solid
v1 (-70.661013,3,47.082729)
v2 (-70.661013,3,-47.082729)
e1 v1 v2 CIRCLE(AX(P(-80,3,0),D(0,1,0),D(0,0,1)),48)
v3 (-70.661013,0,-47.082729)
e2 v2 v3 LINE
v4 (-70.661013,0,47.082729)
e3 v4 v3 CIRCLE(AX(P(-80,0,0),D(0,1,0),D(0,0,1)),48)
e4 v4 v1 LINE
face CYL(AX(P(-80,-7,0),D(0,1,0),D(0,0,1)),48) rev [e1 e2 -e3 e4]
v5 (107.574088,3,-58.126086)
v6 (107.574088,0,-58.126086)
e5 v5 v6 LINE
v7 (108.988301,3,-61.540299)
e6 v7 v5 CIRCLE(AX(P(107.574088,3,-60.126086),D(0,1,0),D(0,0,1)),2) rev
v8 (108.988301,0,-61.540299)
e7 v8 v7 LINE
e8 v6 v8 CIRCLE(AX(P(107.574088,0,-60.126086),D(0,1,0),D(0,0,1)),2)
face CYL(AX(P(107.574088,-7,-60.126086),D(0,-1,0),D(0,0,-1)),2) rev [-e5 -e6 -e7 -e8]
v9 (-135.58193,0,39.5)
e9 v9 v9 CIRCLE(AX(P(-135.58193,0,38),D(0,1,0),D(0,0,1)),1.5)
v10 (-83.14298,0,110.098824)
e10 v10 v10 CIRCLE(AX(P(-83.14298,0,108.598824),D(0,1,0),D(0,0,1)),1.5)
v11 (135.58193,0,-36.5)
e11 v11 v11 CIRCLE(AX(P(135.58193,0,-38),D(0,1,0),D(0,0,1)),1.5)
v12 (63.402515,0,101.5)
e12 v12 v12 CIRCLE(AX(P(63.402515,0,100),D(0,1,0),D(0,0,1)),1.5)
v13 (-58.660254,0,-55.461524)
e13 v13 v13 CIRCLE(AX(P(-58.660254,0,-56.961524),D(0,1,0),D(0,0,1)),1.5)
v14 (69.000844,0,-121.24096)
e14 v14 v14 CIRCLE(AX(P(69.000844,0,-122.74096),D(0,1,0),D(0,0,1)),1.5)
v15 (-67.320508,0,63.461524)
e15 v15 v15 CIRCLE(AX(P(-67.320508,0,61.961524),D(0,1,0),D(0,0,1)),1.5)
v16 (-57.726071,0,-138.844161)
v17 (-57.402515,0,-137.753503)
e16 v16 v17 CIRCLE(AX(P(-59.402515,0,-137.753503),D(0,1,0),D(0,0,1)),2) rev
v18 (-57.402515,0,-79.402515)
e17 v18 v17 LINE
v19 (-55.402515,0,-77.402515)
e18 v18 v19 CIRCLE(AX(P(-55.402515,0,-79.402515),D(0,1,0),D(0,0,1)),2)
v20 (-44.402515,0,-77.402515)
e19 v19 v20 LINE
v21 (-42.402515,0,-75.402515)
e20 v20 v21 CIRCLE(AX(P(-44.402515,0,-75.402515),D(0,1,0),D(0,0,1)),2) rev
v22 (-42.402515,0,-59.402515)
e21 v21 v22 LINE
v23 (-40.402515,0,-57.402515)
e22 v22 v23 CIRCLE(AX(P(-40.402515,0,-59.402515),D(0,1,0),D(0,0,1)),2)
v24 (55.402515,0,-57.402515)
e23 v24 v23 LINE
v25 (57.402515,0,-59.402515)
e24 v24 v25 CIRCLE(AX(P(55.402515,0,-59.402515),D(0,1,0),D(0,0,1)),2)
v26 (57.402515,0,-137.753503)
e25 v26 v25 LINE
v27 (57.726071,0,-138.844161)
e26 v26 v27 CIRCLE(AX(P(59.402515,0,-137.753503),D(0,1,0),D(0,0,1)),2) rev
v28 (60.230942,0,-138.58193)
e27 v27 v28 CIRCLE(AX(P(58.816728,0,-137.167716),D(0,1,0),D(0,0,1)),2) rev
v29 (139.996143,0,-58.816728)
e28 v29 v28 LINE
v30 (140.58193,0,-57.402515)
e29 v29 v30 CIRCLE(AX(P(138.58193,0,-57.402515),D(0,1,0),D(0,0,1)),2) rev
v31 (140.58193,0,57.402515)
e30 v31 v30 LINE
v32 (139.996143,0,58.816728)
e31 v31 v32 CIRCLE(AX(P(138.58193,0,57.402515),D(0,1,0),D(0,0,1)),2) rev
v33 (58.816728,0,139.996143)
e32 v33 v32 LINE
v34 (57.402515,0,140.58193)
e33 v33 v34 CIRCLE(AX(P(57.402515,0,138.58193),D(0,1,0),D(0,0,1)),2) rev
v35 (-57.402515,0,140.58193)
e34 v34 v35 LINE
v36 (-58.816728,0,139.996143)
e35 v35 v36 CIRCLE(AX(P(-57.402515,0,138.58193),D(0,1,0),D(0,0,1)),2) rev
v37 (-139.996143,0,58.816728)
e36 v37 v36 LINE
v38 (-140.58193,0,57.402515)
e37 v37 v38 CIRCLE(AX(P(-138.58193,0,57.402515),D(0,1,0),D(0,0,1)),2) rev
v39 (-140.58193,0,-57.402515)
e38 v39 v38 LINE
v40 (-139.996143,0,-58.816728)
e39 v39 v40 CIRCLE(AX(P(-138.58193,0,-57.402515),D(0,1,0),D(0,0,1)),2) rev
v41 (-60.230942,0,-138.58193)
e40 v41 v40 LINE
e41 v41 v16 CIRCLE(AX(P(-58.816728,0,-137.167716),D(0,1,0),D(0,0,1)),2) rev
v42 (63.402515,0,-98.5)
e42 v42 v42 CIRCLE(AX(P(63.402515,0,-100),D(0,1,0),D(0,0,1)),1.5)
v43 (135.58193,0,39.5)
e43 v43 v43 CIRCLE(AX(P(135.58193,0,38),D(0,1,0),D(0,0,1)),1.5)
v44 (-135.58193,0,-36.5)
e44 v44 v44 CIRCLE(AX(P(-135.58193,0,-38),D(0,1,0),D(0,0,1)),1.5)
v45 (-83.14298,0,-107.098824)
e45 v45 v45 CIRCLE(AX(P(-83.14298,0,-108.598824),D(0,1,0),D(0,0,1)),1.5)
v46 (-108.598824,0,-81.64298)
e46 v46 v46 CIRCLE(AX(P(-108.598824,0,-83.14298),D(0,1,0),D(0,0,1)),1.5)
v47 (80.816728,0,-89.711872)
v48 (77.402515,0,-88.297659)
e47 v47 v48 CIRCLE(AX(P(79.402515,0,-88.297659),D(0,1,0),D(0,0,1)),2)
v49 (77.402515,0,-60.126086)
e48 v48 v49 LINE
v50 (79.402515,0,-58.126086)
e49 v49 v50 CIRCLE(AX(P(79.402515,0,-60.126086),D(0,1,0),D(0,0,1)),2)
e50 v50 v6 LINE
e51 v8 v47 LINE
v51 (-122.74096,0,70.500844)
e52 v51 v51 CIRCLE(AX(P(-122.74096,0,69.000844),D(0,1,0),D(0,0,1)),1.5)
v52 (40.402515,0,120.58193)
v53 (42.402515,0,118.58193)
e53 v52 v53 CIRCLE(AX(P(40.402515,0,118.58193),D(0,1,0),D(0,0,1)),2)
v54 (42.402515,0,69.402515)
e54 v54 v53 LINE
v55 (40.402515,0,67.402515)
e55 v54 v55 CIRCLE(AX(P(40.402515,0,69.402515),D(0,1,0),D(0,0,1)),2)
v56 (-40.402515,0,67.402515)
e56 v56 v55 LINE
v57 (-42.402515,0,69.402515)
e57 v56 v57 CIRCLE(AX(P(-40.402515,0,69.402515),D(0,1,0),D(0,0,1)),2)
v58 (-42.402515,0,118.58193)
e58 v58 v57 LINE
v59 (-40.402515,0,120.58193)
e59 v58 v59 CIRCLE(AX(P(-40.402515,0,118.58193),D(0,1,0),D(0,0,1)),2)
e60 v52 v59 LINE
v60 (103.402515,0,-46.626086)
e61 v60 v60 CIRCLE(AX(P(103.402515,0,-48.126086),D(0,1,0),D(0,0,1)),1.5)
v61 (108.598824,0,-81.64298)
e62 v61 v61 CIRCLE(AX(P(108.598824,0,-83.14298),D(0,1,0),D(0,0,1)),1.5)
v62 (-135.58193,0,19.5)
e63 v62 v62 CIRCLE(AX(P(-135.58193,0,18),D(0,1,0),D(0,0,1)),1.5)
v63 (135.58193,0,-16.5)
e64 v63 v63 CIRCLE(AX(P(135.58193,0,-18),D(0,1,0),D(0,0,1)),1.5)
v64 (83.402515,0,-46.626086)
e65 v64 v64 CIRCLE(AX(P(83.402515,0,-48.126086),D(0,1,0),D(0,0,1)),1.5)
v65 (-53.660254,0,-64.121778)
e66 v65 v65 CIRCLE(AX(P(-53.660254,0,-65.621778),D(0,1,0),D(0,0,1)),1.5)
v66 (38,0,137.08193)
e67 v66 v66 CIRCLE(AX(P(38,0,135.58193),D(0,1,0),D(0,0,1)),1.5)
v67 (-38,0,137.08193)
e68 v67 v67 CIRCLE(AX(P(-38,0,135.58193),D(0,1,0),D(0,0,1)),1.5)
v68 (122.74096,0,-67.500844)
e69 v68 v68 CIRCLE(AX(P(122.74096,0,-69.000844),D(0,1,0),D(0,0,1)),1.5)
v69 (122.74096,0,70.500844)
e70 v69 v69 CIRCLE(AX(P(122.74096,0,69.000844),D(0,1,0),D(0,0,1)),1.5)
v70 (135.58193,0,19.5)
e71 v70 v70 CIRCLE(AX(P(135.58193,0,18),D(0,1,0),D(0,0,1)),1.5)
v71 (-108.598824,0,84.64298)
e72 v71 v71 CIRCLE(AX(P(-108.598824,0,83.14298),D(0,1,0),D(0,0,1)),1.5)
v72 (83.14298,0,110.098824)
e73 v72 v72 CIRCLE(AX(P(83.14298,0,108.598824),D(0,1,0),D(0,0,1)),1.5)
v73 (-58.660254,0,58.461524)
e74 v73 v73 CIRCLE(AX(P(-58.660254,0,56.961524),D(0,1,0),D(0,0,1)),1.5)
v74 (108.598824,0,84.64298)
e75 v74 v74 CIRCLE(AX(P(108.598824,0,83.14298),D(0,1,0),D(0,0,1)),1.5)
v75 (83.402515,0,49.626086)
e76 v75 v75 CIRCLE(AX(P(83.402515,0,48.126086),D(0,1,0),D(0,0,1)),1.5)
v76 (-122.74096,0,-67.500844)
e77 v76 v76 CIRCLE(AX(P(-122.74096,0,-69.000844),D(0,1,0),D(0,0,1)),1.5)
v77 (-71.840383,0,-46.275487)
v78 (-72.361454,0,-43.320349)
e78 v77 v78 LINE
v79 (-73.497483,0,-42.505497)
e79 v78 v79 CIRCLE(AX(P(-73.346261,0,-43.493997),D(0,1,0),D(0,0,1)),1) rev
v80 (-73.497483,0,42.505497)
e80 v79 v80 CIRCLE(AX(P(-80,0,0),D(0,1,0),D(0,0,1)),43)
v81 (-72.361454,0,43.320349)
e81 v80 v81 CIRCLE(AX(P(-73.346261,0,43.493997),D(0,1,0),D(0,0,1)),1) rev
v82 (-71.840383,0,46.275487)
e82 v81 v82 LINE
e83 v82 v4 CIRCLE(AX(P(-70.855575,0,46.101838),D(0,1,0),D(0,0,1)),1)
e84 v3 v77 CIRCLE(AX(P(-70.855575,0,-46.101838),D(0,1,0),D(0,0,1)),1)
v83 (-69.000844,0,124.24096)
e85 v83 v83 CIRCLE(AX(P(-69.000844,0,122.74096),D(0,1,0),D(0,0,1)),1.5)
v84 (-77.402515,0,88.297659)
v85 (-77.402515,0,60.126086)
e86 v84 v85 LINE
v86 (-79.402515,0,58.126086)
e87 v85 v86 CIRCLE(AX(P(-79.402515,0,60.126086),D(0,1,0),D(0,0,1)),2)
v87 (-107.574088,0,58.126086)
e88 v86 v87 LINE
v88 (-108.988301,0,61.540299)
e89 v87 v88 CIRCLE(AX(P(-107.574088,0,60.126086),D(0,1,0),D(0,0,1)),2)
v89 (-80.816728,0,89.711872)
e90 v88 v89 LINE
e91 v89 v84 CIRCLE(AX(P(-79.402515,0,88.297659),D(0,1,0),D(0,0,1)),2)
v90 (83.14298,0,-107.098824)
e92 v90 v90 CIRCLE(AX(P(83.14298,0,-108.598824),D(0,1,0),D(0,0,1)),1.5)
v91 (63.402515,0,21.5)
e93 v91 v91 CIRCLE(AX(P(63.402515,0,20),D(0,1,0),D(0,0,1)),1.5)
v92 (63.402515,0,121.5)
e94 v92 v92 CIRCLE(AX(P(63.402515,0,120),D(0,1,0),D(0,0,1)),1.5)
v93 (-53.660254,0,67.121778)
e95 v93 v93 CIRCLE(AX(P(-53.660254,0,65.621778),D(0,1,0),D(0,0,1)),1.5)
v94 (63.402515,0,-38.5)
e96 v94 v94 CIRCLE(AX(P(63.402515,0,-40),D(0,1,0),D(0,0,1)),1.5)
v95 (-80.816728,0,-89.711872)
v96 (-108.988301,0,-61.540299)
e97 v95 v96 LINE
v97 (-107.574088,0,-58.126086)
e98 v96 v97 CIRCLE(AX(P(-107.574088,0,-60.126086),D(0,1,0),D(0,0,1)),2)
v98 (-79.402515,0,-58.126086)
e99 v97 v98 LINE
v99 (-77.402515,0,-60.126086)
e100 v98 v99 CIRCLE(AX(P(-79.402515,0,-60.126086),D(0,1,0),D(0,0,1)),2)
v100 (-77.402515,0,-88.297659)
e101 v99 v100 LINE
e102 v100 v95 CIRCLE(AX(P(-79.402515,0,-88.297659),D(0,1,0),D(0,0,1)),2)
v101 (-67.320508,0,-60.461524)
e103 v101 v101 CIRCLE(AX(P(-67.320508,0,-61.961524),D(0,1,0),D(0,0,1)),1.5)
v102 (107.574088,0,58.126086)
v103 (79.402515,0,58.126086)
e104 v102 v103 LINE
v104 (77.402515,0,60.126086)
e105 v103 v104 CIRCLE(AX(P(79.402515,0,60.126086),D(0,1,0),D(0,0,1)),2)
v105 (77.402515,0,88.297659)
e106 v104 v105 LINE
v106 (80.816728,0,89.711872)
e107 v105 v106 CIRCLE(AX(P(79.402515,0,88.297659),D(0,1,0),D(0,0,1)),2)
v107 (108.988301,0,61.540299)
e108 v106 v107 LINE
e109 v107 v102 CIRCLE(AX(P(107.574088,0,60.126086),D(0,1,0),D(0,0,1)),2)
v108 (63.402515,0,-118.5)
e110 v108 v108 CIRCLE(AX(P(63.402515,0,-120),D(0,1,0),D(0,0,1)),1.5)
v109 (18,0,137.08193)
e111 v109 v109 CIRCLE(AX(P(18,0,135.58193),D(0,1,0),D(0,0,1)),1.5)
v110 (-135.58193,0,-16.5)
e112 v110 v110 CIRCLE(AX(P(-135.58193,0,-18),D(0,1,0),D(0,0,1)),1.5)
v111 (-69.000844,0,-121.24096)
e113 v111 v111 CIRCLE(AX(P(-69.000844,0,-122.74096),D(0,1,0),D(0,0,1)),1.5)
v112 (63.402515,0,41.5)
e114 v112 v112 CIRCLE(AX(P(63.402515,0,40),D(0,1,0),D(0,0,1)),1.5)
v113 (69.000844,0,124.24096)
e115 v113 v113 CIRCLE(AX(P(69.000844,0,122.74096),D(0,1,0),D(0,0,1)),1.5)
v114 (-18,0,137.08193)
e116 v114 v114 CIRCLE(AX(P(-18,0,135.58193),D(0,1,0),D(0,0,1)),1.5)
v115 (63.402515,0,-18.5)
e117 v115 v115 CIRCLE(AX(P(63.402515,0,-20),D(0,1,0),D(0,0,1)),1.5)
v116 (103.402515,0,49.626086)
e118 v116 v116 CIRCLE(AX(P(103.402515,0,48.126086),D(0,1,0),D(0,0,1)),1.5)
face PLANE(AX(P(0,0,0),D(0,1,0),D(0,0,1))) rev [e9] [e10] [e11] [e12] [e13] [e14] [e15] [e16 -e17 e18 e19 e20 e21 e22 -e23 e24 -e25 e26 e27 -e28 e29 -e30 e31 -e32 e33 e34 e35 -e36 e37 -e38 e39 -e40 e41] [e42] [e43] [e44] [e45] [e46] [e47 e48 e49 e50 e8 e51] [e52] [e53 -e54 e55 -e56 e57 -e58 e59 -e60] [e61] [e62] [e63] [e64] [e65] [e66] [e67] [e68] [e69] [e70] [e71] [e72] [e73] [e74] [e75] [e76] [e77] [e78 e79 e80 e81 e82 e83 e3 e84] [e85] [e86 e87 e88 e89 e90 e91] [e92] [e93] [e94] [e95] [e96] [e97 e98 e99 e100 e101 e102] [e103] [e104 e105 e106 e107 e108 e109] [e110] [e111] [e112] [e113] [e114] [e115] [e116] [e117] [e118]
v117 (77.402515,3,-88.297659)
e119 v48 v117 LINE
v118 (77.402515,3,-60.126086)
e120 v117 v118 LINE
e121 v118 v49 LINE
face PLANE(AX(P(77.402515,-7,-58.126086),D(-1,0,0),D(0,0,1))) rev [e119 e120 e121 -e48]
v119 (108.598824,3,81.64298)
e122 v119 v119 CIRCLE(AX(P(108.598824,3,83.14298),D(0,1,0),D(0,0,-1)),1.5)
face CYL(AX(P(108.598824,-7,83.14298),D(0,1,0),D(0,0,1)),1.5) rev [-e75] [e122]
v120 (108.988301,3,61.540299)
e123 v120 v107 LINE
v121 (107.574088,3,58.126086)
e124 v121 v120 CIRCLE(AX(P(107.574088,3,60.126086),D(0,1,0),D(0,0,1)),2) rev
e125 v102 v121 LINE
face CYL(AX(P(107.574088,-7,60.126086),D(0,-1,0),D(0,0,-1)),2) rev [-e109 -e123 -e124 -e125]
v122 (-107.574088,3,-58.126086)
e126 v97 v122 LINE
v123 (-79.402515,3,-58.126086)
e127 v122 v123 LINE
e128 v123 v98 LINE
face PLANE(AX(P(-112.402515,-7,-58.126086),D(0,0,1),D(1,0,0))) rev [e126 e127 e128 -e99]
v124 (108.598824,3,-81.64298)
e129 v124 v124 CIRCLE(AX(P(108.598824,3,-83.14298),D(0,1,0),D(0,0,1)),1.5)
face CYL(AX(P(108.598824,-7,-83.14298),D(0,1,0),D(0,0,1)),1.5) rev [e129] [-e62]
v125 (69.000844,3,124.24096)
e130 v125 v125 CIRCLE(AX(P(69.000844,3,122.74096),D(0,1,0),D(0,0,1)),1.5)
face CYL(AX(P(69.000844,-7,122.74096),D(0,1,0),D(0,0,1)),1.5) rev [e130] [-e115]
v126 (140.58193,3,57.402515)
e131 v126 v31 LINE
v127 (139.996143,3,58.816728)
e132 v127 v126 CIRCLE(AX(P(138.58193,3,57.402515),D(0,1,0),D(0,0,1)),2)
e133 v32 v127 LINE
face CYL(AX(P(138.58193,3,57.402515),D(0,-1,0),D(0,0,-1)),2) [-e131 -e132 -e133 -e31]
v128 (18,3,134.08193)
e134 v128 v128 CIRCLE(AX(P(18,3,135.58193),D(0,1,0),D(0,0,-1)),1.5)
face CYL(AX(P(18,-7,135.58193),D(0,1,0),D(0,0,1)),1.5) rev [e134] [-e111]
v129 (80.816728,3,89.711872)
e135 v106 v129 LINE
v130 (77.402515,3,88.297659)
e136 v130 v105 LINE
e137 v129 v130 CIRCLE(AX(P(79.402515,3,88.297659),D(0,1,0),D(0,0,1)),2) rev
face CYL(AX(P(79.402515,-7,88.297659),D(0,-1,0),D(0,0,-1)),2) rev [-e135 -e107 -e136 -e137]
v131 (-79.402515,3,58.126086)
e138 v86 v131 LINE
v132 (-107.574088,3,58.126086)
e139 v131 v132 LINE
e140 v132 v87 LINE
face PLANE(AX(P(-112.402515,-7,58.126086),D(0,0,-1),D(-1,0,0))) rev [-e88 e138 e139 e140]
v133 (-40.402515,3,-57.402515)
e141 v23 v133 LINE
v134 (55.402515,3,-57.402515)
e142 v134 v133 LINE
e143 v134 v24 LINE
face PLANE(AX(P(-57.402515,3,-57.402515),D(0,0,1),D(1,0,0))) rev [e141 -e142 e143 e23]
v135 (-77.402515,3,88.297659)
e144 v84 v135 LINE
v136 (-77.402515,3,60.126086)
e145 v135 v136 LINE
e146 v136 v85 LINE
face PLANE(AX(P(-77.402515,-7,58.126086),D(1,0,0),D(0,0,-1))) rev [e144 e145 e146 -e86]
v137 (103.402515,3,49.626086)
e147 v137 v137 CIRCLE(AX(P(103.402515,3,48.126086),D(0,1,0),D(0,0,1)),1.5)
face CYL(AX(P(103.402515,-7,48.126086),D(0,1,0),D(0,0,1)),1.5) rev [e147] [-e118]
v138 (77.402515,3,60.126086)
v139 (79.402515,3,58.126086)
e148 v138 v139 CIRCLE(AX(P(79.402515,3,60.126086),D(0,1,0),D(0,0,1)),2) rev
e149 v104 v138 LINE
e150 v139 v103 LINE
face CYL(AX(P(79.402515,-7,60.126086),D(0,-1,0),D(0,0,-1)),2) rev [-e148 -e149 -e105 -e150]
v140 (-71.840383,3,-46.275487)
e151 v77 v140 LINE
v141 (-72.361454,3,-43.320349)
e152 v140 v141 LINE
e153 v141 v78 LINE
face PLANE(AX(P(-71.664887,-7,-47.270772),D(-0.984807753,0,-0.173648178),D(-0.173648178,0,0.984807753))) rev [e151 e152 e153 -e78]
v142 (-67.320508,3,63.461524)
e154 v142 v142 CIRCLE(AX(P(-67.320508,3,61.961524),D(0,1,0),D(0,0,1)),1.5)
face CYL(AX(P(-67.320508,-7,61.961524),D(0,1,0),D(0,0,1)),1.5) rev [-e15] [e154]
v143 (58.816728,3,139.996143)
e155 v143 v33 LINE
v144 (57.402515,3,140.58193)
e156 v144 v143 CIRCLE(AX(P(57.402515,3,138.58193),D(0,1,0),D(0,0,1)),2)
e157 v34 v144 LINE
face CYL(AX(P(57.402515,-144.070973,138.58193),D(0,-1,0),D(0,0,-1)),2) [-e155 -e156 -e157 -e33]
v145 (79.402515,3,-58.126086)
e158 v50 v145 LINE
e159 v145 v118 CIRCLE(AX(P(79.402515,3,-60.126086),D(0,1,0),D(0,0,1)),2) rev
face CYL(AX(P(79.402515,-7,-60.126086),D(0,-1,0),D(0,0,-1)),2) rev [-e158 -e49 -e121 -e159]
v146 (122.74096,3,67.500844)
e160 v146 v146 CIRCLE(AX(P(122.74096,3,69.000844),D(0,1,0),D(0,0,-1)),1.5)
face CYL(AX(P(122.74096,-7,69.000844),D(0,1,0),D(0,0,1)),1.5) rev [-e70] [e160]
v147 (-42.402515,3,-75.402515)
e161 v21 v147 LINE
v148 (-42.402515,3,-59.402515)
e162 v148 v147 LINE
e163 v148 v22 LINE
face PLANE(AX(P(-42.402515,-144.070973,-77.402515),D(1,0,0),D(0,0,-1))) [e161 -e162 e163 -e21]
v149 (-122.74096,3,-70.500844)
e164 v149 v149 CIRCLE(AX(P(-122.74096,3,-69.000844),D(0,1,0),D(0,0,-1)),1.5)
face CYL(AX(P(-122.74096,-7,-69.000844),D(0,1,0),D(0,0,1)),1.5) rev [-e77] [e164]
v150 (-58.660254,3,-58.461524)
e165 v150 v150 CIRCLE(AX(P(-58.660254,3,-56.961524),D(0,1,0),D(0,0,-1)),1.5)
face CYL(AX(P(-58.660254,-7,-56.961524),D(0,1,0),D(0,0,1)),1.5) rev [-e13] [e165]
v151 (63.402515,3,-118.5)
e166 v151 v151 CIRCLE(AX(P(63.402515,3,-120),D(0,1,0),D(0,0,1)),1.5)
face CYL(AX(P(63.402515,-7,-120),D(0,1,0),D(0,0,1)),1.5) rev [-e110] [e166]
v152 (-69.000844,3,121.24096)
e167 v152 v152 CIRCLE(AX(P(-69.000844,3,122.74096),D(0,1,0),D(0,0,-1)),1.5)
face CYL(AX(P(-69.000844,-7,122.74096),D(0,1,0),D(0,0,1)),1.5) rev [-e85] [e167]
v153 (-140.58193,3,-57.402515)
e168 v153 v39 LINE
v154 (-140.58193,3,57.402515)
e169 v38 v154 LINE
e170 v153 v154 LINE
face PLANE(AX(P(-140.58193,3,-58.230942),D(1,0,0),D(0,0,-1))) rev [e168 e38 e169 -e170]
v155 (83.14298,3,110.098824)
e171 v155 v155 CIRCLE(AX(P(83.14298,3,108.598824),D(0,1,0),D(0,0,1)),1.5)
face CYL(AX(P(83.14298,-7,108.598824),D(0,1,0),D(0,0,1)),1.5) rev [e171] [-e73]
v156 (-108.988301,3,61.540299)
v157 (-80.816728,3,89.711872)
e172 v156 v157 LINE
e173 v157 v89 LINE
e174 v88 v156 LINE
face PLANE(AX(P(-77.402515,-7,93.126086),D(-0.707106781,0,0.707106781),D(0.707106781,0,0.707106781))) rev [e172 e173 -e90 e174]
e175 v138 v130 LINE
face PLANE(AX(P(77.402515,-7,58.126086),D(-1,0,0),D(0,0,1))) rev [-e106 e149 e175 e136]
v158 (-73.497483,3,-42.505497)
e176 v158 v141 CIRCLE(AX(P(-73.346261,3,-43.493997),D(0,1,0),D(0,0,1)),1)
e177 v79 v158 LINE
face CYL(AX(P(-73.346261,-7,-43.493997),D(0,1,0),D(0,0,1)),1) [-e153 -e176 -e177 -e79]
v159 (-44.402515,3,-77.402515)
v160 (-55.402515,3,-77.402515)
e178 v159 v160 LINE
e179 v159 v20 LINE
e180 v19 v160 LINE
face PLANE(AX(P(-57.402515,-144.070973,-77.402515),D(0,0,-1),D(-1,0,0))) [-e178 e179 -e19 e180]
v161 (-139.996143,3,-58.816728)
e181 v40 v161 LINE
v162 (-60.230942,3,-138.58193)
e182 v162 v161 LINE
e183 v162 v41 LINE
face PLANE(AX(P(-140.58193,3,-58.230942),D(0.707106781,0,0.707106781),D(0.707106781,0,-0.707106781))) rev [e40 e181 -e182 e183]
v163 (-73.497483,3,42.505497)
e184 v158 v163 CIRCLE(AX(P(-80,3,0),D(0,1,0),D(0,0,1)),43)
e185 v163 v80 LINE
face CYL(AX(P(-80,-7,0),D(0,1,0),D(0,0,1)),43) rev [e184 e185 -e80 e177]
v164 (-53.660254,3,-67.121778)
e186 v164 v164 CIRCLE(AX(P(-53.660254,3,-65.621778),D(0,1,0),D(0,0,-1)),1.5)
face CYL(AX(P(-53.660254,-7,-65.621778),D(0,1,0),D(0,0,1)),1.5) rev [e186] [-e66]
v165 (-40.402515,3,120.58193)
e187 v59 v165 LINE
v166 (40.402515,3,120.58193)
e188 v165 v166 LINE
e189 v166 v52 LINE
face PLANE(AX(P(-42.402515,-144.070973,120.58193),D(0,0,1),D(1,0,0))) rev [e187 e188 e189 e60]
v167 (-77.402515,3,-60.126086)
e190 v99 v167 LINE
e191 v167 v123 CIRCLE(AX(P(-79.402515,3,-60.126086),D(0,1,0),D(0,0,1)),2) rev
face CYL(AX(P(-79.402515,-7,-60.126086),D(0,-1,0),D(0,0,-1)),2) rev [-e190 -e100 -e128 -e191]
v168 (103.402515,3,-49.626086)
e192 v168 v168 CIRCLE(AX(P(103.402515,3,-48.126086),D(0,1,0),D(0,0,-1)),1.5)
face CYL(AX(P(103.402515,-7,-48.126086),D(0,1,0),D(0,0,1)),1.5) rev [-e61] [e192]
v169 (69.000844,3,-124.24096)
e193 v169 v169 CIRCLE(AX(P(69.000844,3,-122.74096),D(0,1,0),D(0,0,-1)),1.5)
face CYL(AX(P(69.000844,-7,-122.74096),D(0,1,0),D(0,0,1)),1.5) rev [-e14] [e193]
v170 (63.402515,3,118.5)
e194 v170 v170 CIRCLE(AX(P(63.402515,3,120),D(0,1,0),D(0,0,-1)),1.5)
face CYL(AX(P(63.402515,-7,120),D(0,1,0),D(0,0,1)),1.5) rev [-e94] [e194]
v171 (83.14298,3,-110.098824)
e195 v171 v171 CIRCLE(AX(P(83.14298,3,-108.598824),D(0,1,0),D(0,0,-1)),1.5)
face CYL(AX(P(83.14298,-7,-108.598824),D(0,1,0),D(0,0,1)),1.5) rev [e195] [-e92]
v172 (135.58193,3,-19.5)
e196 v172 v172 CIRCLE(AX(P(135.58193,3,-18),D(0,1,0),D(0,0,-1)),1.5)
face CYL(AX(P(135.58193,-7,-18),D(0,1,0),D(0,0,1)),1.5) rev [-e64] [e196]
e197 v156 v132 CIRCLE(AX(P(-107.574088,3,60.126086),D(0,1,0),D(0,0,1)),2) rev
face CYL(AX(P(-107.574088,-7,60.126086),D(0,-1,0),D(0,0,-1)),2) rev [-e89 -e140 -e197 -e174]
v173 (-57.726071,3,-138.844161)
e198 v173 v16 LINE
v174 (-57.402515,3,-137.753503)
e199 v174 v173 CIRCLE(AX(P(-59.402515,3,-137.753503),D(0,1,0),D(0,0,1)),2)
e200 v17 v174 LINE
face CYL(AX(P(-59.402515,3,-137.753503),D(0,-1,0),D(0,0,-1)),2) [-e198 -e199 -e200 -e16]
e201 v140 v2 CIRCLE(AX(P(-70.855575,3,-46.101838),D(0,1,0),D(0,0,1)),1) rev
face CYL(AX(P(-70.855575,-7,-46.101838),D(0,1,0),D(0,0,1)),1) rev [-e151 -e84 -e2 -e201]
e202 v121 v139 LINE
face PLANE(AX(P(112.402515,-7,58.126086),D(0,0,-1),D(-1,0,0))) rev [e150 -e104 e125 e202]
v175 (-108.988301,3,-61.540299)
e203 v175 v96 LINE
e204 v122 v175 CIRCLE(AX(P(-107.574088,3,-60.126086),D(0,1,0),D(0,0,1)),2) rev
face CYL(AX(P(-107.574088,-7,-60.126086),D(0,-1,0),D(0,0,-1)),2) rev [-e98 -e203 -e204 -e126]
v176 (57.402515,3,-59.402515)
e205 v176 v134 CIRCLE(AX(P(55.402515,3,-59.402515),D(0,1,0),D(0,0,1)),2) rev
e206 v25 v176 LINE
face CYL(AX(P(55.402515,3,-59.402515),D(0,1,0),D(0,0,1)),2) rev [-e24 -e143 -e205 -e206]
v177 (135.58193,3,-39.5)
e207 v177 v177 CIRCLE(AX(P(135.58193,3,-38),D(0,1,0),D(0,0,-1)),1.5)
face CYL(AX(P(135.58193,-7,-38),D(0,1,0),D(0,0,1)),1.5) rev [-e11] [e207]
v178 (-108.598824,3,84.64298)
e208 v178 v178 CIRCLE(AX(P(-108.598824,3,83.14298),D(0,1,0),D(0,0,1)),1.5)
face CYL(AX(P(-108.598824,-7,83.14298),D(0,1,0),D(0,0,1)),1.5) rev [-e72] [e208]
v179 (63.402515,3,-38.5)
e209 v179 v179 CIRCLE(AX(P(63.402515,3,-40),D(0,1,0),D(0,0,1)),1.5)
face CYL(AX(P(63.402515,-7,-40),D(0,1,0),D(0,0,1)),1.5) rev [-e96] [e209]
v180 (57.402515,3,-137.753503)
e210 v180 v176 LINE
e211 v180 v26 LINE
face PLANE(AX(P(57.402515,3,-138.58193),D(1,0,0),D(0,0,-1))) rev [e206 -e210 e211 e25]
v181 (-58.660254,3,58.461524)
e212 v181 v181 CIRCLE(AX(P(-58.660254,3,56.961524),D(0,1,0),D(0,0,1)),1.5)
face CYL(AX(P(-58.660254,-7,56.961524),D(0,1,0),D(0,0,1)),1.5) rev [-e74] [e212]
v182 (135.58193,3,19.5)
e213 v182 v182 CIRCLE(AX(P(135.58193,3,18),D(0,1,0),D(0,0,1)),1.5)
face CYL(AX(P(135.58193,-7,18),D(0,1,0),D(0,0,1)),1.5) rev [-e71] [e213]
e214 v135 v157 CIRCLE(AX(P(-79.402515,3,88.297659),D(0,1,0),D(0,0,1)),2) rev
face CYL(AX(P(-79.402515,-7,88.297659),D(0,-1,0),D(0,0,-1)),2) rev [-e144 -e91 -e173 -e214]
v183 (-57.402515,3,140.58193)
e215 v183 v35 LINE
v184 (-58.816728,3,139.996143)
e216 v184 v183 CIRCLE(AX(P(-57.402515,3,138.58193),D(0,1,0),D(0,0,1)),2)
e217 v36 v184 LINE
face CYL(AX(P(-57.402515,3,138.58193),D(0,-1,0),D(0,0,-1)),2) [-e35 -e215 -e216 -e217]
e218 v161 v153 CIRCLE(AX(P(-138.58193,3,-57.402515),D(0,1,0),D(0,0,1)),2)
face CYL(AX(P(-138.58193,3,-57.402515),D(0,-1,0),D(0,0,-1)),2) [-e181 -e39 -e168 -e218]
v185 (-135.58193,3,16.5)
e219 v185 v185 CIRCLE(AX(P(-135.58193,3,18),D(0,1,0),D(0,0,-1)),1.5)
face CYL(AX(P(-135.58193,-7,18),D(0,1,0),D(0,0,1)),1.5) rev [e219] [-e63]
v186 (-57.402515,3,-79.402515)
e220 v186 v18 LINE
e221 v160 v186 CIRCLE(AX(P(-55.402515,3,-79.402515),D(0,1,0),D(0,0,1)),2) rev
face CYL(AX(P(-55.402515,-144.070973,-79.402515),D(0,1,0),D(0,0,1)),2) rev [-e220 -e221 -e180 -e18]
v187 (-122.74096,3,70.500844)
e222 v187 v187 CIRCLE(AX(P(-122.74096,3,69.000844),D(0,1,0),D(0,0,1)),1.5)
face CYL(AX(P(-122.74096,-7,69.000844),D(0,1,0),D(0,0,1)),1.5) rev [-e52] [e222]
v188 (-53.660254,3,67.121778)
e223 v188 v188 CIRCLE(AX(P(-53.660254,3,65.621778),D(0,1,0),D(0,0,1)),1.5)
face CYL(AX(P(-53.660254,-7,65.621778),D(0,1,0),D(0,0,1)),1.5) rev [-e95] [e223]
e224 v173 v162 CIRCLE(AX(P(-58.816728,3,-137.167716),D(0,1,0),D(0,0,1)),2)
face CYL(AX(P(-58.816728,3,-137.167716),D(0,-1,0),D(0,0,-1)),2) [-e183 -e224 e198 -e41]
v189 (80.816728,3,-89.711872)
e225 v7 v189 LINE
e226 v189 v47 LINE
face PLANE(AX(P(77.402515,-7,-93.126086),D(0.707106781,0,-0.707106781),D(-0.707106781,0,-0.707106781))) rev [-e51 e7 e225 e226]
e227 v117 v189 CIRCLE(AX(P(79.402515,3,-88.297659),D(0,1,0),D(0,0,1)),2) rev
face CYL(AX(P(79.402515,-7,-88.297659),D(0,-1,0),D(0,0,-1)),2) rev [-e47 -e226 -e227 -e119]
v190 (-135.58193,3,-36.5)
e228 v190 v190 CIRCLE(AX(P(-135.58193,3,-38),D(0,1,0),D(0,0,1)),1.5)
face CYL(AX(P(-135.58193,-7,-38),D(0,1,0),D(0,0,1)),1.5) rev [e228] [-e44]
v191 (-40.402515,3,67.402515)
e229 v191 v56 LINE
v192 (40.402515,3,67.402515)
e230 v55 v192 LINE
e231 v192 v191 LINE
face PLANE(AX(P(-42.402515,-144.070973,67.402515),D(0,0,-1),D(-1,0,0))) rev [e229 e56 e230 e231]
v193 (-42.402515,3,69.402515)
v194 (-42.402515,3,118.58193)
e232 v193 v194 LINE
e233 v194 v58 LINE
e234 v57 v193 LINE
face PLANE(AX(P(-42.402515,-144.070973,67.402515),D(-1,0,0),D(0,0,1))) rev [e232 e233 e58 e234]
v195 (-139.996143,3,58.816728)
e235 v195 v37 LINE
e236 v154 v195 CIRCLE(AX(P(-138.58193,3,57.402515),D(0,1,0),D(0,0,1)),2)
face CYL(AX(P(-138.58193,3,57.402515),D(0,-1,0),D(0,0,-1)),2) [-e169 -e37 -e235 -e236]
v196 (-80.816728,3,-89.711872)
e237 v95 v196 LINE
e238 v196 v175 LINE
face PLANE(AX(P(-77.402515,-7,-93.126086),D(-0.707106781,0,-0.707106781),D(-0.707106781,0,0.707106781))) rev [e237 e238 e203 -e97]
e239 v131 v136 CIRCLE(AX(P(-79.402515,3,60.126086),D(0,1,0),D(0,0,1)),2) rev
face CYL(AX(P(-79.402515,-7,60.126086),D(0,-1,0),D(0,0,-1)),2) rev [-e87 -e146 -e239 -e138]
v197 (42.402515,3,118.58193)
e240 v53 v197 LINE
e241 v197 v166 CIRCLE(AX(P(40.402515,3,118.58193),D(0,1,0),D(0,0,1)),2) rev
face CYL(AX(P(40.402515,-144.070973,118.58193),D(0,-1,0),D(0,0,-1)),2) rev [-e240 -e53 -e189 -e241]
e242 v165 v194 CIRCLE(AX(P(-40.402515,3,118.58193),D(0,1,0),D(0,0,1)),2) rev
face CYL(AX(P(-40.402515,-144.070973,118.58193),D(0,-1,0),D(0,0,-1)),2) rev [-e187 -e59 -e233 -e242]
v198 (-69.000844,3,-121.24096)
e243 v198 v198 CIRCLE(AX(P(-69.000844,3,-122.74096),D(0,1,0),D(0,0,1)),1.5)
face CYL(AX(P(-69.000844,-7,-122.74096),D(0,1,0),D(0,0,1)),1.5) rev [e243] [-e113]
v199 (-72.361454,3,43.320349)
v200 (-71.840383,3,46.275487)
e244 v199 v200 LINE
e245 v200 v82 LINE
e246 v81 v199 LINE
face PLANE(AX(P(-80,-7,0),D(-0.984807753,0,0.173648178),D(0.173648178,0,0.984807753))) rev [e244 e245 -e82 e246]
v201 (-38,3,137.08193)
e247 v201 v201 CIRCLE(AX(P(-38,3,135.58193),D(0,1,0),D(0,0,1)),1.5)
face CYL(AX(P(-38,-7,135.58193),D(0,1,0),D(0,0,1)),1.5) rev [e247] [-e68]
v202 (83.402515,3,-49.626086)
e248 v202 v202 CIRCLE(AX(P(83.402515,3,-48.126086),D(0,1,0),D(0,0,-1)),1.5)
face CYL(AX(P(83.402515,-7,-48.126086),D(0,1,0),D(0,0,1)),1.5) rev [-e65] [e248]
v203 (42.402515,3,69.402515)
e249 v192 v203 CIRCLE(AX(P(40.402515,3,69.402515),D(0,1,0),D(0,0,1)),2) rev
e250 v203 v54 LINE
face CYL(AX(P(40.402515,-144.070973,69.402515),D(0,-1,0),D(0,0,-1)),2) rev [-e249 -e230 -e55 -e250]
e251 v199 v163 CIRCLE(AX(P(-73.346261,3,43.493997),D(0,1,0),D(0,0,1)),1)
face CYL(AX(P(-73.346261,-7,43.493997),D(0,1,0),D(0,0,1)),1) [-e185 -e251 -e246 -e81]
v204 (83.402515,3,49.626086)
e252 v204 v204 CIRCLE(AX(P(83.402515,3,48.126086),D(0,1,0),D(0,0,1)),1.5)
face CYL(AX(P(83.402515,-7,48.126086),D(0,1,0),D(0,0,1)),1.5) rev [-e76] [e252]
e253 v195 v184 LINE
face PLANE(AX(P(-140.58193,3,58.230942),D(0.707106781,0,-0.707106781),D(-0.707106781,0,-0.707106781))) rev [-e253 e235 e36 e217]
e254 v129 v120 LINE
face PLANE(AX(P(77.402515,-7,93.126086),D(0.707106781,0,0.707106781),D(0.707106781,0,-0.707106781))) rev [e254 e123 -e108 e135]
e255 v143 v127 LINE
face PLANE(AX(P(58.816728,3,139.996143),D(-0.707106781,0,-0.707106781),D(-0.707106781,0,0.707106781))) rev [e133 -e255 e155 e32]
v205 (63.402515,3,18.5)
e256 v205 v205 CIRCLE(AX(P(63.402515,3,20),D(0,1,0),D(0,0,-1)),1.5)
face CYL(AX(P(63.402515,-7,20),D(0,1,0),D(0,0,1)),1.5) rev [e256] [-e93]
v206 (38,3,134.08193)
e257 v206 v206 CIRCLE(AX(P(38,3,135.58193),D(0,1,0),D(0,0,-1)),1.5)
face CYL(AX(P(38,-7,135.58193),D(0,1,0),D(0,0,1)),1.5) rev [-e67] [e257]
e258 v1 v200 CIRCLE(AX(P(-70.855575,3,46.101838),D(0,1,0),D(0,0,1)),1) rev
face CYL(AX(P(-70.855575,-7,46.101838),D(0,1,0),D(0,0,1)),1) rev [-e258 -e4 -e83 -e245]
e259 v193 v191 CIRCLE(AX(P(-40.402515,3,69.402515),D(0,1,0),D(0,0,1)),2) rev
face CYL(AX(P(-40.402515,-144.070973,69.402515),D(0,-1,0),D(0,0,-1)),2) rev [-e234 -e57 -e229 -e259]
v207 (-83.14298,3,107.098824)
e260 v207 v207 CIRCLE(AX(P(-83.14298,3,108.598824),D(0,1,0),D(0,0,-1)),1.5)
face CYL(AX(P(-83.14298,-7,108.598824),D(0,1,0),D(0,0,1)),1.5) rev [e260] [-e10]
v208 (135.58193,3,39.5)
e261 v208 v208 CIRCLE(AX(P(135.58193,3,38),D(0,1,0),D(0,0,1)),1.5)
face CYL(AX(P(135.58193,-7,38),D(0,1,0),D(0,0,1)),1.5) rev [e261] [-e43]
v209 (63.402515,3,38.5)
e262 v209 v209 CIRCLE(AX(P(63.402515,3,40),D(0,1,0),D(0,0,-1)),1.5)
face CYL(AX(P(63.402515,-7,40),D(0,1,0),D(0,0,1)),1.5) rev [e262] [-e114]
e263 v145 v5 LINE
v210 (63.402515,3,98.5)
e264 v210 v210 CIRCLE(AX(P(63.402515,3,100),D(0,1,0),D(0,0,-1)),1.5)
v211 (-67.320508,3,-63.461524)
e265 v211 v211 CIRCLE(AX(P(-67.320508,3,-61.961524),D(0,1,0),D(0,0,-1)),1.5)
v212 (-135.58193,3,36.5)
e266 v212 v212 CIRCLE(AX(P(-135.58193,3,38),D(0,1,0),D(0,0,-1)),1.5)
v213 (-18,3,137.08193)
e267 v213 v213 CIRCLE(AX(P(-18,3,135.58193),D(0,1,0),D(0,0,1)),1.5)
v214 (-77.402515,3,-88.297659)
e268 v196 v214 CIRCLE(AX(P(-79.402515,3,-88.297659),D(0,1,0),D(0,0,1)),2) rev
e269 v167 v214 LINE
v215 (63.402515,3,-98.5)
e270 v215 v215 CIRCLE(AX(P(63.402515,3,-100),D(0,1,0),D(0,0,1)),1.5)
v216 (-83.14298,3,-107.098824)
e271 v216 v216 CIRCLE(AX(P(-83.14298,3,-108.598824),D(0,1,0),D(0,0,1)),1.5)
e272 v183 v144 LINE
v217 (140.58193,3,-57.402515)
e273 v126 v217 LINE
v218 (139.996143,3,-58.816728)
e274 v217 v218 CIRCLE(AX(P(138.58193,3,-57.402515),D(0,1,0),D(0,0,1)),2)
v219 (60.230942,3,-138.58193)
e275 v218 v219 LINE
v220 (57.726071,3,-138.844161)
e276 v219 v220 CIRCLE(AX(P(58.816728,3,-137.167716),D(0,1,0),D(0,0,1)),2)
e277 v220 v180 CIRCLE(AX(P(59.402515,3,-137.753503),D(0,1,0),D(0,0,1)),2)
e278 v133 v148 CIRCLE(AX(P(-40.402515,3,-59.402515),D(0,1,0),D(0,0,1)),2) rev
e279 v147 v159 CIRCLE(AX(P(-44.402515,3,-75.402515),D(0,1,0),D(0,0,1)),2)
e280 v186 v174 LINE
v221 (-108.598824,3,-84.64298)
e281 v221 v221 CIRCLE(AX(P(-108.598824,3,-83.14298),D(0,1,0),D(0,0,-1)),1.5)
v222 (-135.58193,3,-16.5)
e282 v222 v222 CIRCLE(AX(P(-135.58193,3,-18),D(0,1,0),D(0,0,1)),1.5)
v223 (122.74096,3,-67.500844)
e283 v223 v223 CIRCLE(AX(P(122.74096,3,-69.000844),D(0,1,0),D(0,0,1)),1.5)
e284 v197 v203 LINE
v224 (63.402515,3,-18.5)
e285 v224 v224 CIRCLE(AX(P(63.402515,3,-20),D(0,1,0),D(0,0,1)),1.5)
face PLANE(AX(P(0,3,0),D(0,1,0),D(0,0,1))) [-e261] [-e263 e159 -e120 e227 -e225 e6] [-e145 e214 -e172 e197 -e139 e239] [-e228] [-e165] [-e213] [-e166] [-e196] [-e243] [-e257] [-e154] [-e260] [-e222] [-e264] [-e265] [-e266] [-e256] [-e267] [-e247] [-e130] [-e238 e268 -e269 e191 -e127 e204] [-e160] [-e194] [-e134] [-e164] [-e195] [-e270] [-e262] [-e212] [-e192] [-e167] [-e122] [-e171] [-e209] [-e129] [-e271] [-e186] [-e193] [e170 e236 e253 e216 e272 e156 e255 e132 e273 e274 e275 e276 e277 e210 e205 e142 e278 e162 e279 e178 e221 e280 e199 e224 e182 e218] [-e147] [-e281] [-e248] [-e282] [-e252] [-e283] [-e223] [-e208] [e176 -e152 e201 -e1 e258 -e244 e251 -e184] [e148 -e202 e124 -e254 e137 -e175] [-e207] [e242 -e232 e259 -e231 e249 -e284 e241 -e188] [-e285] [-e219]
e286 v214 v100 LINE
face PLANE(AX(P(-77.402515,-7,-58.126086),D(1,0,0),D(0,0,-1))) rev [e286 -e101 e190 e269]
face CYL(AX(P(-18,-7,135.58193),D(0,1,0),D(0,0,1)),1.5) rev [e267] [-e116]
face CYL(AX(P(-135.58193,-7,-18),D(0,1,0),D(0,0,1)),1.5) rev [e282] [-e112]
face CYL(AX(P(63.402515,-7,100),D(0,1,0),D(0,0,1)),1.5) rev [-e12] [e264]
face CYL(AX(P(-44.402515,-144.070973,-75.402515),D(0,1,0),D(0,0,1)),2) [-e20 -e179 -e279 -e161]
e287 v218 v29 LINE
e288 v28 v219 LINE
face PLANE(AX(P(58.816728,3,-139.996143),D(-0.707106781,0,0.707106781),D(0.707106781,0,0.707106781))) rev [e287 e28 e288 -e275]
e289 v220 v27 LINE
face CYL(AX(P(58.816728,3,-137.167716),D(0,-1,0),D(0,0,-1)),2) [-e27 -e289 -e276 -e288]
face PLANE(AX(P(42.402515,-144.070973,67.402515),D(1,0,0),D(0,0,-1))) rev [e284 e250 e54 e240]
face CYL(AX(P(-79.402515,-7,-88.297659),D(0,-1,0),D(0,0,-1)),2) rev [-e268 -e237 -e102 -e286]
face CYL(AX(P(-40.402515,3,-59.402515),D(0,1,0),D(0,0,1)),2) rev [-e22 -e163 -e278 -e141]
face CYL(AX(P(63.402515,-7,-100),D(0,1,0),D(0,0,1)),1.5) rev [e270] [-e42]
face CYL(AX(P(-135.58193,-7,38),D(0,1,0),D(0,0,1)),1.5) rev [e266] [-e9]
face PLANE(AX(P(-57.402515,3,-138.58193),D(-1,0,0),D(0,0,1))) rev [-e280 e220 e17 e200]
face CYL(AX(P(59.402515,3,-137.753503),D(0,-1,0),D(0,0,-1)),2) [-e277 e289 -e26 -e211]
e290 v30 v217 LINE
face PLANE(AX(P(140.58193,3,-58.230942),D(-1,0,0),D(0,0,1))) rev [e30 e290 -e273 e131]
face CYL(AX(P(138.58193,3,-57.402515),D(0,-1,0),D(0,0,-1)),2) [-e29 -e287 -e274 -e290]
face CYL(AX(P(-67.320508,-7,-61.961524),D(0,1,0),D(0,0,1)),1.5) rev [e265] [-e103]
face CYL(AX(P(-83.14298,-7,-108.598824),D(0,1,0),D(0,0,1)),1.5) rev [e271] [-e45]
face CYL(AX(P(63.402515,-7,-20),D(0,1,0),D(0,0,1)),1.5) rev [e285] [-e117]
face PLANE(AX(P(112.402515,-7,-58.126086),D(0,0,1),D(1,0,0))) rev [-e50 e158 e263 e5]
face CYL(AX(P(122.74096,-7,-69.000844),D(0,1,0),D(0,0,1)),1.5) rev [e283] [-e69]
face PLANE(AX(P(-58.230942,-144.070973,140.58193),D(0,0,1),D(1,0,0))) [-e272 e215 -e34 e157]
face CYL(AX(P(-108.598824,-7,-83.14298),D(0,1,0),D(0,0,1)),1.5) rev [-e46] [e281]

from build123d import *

# Parameters (mm, degrees)
EXTRUDE_1_DEPTH        = 3
SKETCH_6_W             = 15
SKETCH_6_H             = 20
SKETCH_6_W_2           = 84.80502971
SKETCH_6_H_2           = 53.179415022
EXTRUDE_2_DEPTH        = 3
SKETCH_2_R             = 1.5
CUT_EXTRUDE_1_DEPTH    = 10
SKETCH_3_R             = 43
CUT_EXTRUDE_2_DEPTH    = 10
SKETCH_4_R             = 1.5
CUT_EXTRUDE_3_DEPTH    = 10
SKETCH_7_R             = 1.5
CUT_EXTRUDE_4_DEPTH    = 10
CUT_EXTRUDE_5_DEPTH    = 10
SKETCH_9_R             = 1.5
CUT_EXTRUDE_6_DEPTH    = 10
FILLET_1_R             = 2
CUT_EXTRUDE_7614_DEPTH = 10
FILLET_2_R             = 1


with BuildPart() as part:
    # 草图1 → 凸台-拉伸1 (new body)
    with BuildSketch(Plane(origin=(0, 0, 0), x_dir=(1, 0, 0), z_dir=(0, 1, 0))):
        Polygon((-57.402514855, -57.402514855), (57.402514855, -57.402514855), (57.402514855, -138.581929877), (58.816728417, -139.996143439), (140.581929877, -58.23094198), (140.581929877, 58.23094198), (58.816728417, 139.996143439), (57.402514855, 138.581929877), (57.402514855, 57.402514855), (-57.402514855, 57.402514855), (-57.402514855, 138.581929877), (-58.816728417, 139.996143439), (-140.581929877, 58.23094198), (-140.581929877, -58.23094198), (-58.816728417, -139.996143439), (-57.402514855, -138.581929877), align=None)
    extrude(amount=EXTRUDE_1_DEPTH)

    # 草图6 → 凸台-拉伸2 (add)
    # profile 1 of 2: a face of its own
    with BuildSketch(Plane(origin=(0, 3, 0), x_dir=(1, 0, 0), z_dir=(0, 1, 0))):
        with Locations((-49.902514855, 67.402514855)):
            Rectangle(SKETCH_6_W, SKETCH_6_H)
    # profile 2 of 2: a face of its own
    with BuildSketch(Plane(origin=(0, 3, 0), x_dir=(1, 0, 0), z_dir=(0, 1, 0))):
        Polygon((-58.816728417, -139.996143439), (-58.23094198, -140.581929877), (58.23094198, -140.581929877), (58.816728417, -139.996143439), (57.402514855, -138.581929877), (57.402514855, -57.402514855), (-57.402514855, -57.402514855), (-57.402514855, -138.581929877), align=None)
        with Locations((0, -93.992222366)):
            Rectangle(SKETCH_6_W_2, SKETCH_6_H_2, mode=Mode.SUBTRACT)
    extrude(amount=-EXTRUDE_2_DEPTH)

    # 草图2 → 切除-拉伸1 (cut)
    with BuildSketch(Plane(origin=(0, 3, 0), x_dir=(1, 0, 0), z_dir=(0, 1, 0))):
        with Locations(Location((-135.581929877, 18, 0), (0, 0, 270))):
            Circle(SKETCH_2_R)
        with Locations(Location((-135.581929877, 38, 0), (0, 0, 270))):
            Circle(SKETCH_2_R)
        with Locations(Location((-135.581929877, -18, 0), (0, 0, 270))):
            Circle(SKETCH_2_R)
        with Locations(Location((-135.581929877, -38, 0), (0, 0, 270))):
            Circle(SKETCH_2_R)
        with Locations(Location((135.581929877, -38, 0), (0, 0, 270))):
            Circle(SKETCH_2_R)
        with Locations(Location((135.581929877, -18, 0), (0, 0, 270))):
            Circle(SKETCH_2_R)
        with Locations(Location((135.581929877, 38, 0), (0, 0, 270))):
            Circle(SKETCH_2_R)
        with Locations(Location((135.581929877, 18, 0), (0, 0, 270))):
            Circle(SKETCH_2_R)
        with Locations(Location((-83.142979961, 108.598824084, 0), (0, 0, 270))):
            Circle(SKETCH_2_R)
        with Locations(Location((-69.000844337, 122.740959707, 0), (0, 0, 270))):
            Circle(SKETCH_2_R)
        with Locations(Location((-108.598824084, 83.142979961, 0), (0, 0, 270))):
            Circle(SKETCH_2_R)
        with Locations(Location((-122.740959707, 69.000844337, 0), (0, 0, 270))):
            Circle(SKETCH_2_R)
        with Locations(Location((69.000844337, -122.740959707, 0), (0, 0, 270))):
            Circle(SKETCH_2_R)
        with Locations(Location((83.142979961, -108.598824084, 0), (0, 0, 270))):
            Circle(SKETCH_2_R)
        with Locations(Location((122.740959707, -69.000844337, 0), (0, 0, 270))):
            Circle(SKETCH_2_R)
        with Locations(Location((108.598824084, -83.142979961, 0), (0, 0, 270))):
            Circle(SKETCH_2_R)
        with Locations((18, 135.581929877)):
            Circle(SKETCH_2_R)
        with Locations((38, 135.581929877)):
            Circle(SKETCH_2_R)
        with Locations((-18, 135.581929877)):
            Circle(SKETCH_2_R)
        with Locations((-38, 135.581929877)):
            Circle(SKETCH_2_R)
        with Locations(Location((-38, -135.581929877, 0), (0, 0, 270))):
            Circle(SKETCH_2_R)
        with Locations(Location((-18, -135.581929877, 0), (0, 0, 270))):
            Circle(SKETCH_2_R)
        with Locations(Location((38, -135.581929877, 0), (0, 0, 270))):
            Circle(SKETCH_2_R)
        with Locations(Location((18, -135.581929877, 0), (0, 0, 270))):
            Circle(SKETCH_2_R)
        with Locations(Location((108.598824084, 83.142979961, 0), (0, 0, 270))):
            Circle(SKETCH_2_R)
        with Locations(Location((122.740959707, 69.000844337, 0), (0, 0, 270))):
            Circle(SKETCH_2_R)
        with Locations(Location((83.142979961, 108.598824084, 0), (0, 0, 270))):
            Circle(SKETCH_2_R)
        with Locations(Location((69.000844337, 122.740959707, 0), (0, 0, 270))):
            Circle(SKETCH_2_R)
        with Locations(Location((-122.740959707, -69.000844337, 0), (0, 0, 270))):
            Circle(SKETCH_2_R)
        with Locations(Location((-108.598824084, -83.142979961, 0), (0, 0, 270))):
            Circle(SKETCH_2_R)
        with Locations(Location((-69.000844337, -122.740959707, 0), (0, 0, 270))):
            Circle(SKETCH_2_R)
        with Locations(Location((-83.142979961, -108.598824084, 0), (0, 0, 270))):
            Circle(SKETCH_2_R)
    extrude(amount=-CUT_EXTRUDE_1_DEPTH, mode=Mode.SUBTRACT)

    # 草图3 → 切除-拉伸2 (cut)
    with BuildSketch(Plane(origin=(0, 3, 0), x_dir=(1, 0, 0), z_dir=(0, 1, 0))):
        with Locations(Location((-80, 0, 0), (0, 0, 270))):
            Circle(SKETCH_3_R)
    extrude(amount=-CUT_EXTRUDE_2_DEPTH, mode=Mode.SUBTRACT)

    # 草图4 → 切除-拉伸3 (cut)
    with BuildSketch(Plane(origin=(0, 3, 0), x_dir=(1, 0, 0), z_dir=(0, 1, 0))):
        with Locations(Location((-58.660254038, -56.961524227, 0), (0, 0, 270))):
            Circle(SKETCH_4_R)
        with Locations(Location((-67.320508076, -61.961524227, 0), (0, 0, 270))):
            Circle(SKETCH_4_R)
        with Locations(Location((-53.660254038, -65.621778265, 0), (0, 0, 270))):
            Circle(SKETCH_4_R)
        with Locations(Location((-53.660254038, 65.621778265, 0), (0, 0, 270))):
            Circle(SKETCH_4_R)
        with Locations(Location((-58.660254038, 56.961524227, 0), (0, 0, 270))):
            Circle(SKETCH_4_R)
        with Locations(Location((-67.320508076, 61.961524227, 0), (0, 0, 270))):
            Circle(SKETCH_4_R)
    extrude(amount=-CUT_EXTRUDE_3_DEPTH, mode=Mode.SUBTRACT)

    # 草图7 → 切除-拉伸4 (cut)
    with BuildSketch(Plane(origin=(0, 3, 0), x_dir=(1, 0, 0), z_dir=(0, 1, 0))):
        with Locations(Location((63.402514855, 120, 0), (0, 0, 270))):
            Circle(SKETCH_7_R)
        with Locations(Location((63.402514855, 100, 0), (0, 0, 270))):
            Circle(SKETCH_7_R)
        with Locations(Location((63.402514855, 40, 0), (0, 0, 270))):
            Circle(SKETCH_7_R)
        with Locations(Location((63.402514855, 20, 0), (0, 0, 270))):
            Circle(SKETCH_7_R)
        with Locations(Location((63.402514855, -20, 0), (0, 0, 270))):
            Circle(SKETCH_7_R)
        with Locations(Location((63.402514855, -40, 0), (0, 0, 270))):
            Circle(SKETCH_7_R)
        with Locations(Location((63.402514855, -100, 0), (0, 0, 270))):
            Circle(SKETCH_7_R)
        with Locations(Location((63.402514855, -120, 0), (0, 0, 270))):
            Circle(SKETCH_7_R)
    extrude(amount=-CUT_EXTRUDE_4_DEPTH, mode=Mode.SUBTRACT)

    # 草图8 → 切除-拉伸5 (cut)
    with BuildSketch(Plane(origin=(0, 3, 0), x_dir=(1, 0, 0), z_dir=(0, 1, 0))):
        Polygon((77.402514855, -58.126085754), (77.402514855, -93.126085754), (112.402514855, -58.126085754), align=None)
        Polygon((-77.402514855, -93.126085754), (-112.402514855, -58.126085754), (-77.402514855, -58.126085754), align=None)
        Polygon((77.402514855, 93.126085754), (112.402514855, 58.126085754), (77.402514855, 58.126085754), align=None)
        Polygon((-77.402514855, 58.126085754), (-77.402514855, 93.126085754), (-112.402514855, 58.126085754), align=None)
    extrude(amount=-CUT_EXTRUDE_5_DEPTH, mode=Mode.SUBTRACT)

    # 草图9 → 切除-拉伸6 (cut)
    with BuildSketch(Plane(origin=(0, 3, 0), x_dir=(1, 0, 0), z_dir=(0, 1, 0))):
        with Locations(Location((83.402514855, -48.126085754, 0), (0, 0, 270))):
            Circle(SKETCH_9_R)
        with Locations(Location((103.402514855, -48.126085754, 0), (0, 0, 270))):
            Circle(SKETCH_9_R)
        with Locations(Location((103.402514855, 48.126085754, 0), (0, 0, 270))):
            Circle(SKETCH_9_R)
        with Locations(Location((83.402514855, 48.126085754, 0), (0, 0, 270))):
            Circle(SKETCH_9_R)
    extrude(amount=-CUT_EXTRUDE_6_DEPTH, mode=Mode.SUBTRACT)

    # 圆角1
    # the kernel refuses this fillet: 2 mm, written as the material it adds along each edge
    with BuildSketch(Plane(origin=(-42.402514855, 3, 67.402514855), x_dir=(1, 0, 0), z_dir=(0, -1, 0)), Plane(origin=(42.402514855, 3, 67.402514855), x_dir=(0, 0, 1), z_dir=(0, -1, 0)), Plane(origin=(57.402514855, 0, -57.402514855), x_dir=(0, 0, -1), z_dir=(0, 1, 0)), Plane(origin=(77.402514855, 3, -58.126085754), x_dir=(0, 0, -1), z_dir=(0, -1, 0)), Plane(origin=(-77.402514855, 3, 58.126085754), x_dir=(0, 0, 1), z_dir=(0, -1, 0))) as fillet_1_piece_1:
        with BuildLine():
            CenterArc((FILLET_1_R, FILLET_1_R), FILLET_1_R, 180, 90)
            Line((0, FILLET_1_R), (0, 0))
            Line((0, 0), (FILLET_1_R, 0))
        make_face()
    extrude(amount=3)
    with BuildSketch(Plane(origin=(-42.402514855, 3, 120.581929877), x_dir=(1, 0, 0), z_dir=(0, -1, 0)), Plane(origin=(42.402514855, 3, 120.581929877), x_dir=(0, 0, -1), z_dir=(0, -1, 0)), Plane(origin=(-57.402514855, 3, -77.402514855), x_dir=(1, 0, 0), z_dir=(0, -1, 0)), Plane(origin=(-42.402514855, 3, -57.402514855), x_dir=(1, 0, 0), z_dir=(0, -1, 0)), Plane(origin=(77.402514855, 3, 58.126085754), x_dir=(0, 0, 1), z_dir=(0, -1, 0)), Plane(origin=(-77.402514855, 3, -58.126085754), x_dir=(0, 0, -1), z_dir=(0, -1, 0))) as fillet_1_piece_2:
        with BuildLine():
            CenterArc((FILLET_1_R, -FILLET_1_R), FILLET_1_R, 90, 90)
            Line((0, -FILLET_1_R), (0, 0))
            Line((0, 0), (FILLET_1_R, 0))
        make_face()
    extrude(amount=3)
    with BuildSketch(Plane(origin=(77.402514855, 3, 93.126085754), x_dir=(0, 0, -1), z_dir=(0, -1, 0)), Plane(origin=(-77.402514855, 3, -93.126085754), x_dir=(0, 0, 1), z_dir=(0, -1, 0)), Plane(origin=(112.402514855, 3, -58.126085754), x_dir=(-1, 0, 0), z_dir=(0, -1, 0)), Plane(origin=(-112.402514855, 3, 58.126085754), x_dir=(1, 0, 0), z_dir=(0, -1, 0))) as fillet_1_piece_3:
        with BuildLine():
            CenterArc((FILLET_1_R * 2.41421356237, FILLET_1_R), FILLET_1_R, 135, 135)
            Line((FILLET_1_R * 1.70710678119, FILLET_1_R * 1.70710678119), (0, 0))
            Line((0, 0), (FILLET_1_R * 2.41421356237, 0))
        make_face()
    extrude(amount=3)
    with BuildSketch(Plane(origin=(112.402514855, 3, 58.126085754), x_dir=(-1, 0, 0), z_dir=(0, -1, 0)), Plane(origin=(-112.402514855, 3, -58.126085754), x_dir=(1, 0, 0), z_dir=(0, -1, 0)), Plane(origin=(77.402514855, 3, -93.126085754), x_dir=(0, 0, 1), z_dir=(0, -1, 0)), Plane(origin=(-77.402514855, 3, 93.126085754), x_dir=(0, 0, -1), z_dir=(0, -1, 0))) as fillet_1_piece_4:
        with BuildLine():
            CenterArc((FILLET_1_R * 2.41421356237, -FILLET_1_R), FILLET_1_R, 90, 135)
            Line((FILLET_1_R * 1.70710678119, -FILLET_1_R * 1.70710678119), (0, 0))
            Line((0, 0), (FILLET_1_R * 2.41421356237, 0))
        make_face()
    extrude(amount=3)
    # the kernel refuses this fillet: 2 mm, written as the material it takes off along each edge
    with BuildSketch(Plane(origin=(-58.23094198, 5.071067812, 140.581929877), x_dir=(1, 0, 0), z_dir=(0, -1, 0)), Plane(origin=(57.402514855, -2.071067812, -138.581929877), x_dir=(0.7071067811865475, 0, -0.7071067811865475), z_dir=(0, 1, 0)), Plane(origin=(140.581929877, -2.071067812, -58.23094198), x_dir=(0, 0, 1), z_dir=(0, 1, 0)), Plane(origin=(58.23094198, 5.071067812, 140.581929877), x_dir=(0.7071067811865304, 0, -0.7071067811865647), z_dir=(0, -1, 0)), Plane(origin=(140.581929877, -2.071067812, 58.23094198), x_dir=(-0.7071067811865518, 0, 0.7071067811865432), z_dir=(0, 1, 0))) as fillet_1_2_piece_1:
        with BuildLine():
            CenterArc((FILLET_1_R * 0.414213562373, -FILLET_1_R), FILLET_1_R, 90, 45)
            Line((-FILLET_1_R * 0.292893218813, -FILLET_1_R * 0.292893218813), (0, 0))
            Line((0, 0), (FILLET_1_R * 0.414213562373, 0))
        make_face()
    extrude(amount=7.142135624, mode=Mode.SUBTRACT)
    with BuildSketch(Plane(origin=(-140.581929877, -2.071067812, 58.23094198), x_dir=(0.7071067811865475, 0, 0.7071067811865475), z_dir=(0, 1, 0)), Plane(origin=(-140.581929877, -2.071067812, -58.23094198), x_dir=(0, 0, 1), z_dir=(0, 1, 0)), Plane(origin=(-57.402514855, -2.071067812, -138.581929877), x_dir=(-0.7071067811865561, 0, -0.707106781186539), z_dir=(0, 1, 0))) as fillet_1_2_piece_2:
        with BuildLine():
            CenterArc((FILLET_1_R * 0.414213562373, FILLET_1_R), FILLET_1_R, 225, 45)
            Line((-FILLET_1_R * 0.292893218813, FILLET_1_R * 0.292893218813), (0, 0))
            Line((0, 0), (FILLET_1_R * 0.414213562373, 0))
        make_face()
    extrude(amount=7.142135624, mode=Mode.SUBTRACT)
    with BuildSketch(Plane(origin=(-58.816728417, -5, -139.996143439), x_dir=(-0.7071067811865458, 0, 0.7071067811865493), z_dir=(0, 1, 0)), Plane(origin=(-42.402514855, 8, -77.402514855), x_dir=(0, 0, 1), z_dir=(0, -1, 0))) as fillet_1_2_piece_3:
        with BuildLine():
            CenterArc((FILLET_1_R, FILLET_1_R), FILLET_1_R, 180, 90)
            Line((0, FILLET_1_R), (0, 0))
            Line((0, 0), (FILLET_1_R, 0))
        make_face()
    extrude(amount=13, mode=Mode.SUBTRACT)
    with BuildSketch(Plane(origin=(58.816728417, -5, -139.996143439), x_dir=(0.7071067811865458, 0, 0.7071067811865493), z_dir=(0, 1, 0))) as fillet_1_2_piece_4:
        with BuildLine():
            CenterArc((FILLET_1_R, -FILLET_1_R), FILLET_1_R, 90, 90)
            Line((0, -FILLET_1_R), (0, 0))
            Line((0, 0), (FILLET_1_R, 0))
        make_face()
    extrude(amount=13, mode=Mode.SUBTRACT)

    # 草图10 → Cut-Extrude 7614 (cut)
    with BuildSketch(Plane(origin=(0, 3, 0), x_dir=(1, 0, 0), z_dir=(0, 1, 0))):
        with BuildLine():
            Line((-71.664887472, 47.270772145), (-80, 0))
            Line((-80, 0), (-71.664887472, -47.270772145))
            ThreePointArc((-71.664887472, -47.270772145), (-32, 0), (-71.664887472, 47.270772145))
        make_face()
    extrude(amount=-CUT_EXTRUDE_7614_DEPTH, mode=Mode.SUBTRACT)

    # 圆角2
    fillet_2_edges = [part.edges().sort_by_distance(p)[0] for p in [
        (-72.53312836, 1.5, -42.34673338),
        (-72.53312836, 1.5, 42.34673338),
        (-71.664887472, 1.5, -47.270772145),
        (-71.664887472, 1.5, 47.270772145),
    ]]
    fillet(fillet_2_edges, radius=FILLET_2_R)


solid = part.part
